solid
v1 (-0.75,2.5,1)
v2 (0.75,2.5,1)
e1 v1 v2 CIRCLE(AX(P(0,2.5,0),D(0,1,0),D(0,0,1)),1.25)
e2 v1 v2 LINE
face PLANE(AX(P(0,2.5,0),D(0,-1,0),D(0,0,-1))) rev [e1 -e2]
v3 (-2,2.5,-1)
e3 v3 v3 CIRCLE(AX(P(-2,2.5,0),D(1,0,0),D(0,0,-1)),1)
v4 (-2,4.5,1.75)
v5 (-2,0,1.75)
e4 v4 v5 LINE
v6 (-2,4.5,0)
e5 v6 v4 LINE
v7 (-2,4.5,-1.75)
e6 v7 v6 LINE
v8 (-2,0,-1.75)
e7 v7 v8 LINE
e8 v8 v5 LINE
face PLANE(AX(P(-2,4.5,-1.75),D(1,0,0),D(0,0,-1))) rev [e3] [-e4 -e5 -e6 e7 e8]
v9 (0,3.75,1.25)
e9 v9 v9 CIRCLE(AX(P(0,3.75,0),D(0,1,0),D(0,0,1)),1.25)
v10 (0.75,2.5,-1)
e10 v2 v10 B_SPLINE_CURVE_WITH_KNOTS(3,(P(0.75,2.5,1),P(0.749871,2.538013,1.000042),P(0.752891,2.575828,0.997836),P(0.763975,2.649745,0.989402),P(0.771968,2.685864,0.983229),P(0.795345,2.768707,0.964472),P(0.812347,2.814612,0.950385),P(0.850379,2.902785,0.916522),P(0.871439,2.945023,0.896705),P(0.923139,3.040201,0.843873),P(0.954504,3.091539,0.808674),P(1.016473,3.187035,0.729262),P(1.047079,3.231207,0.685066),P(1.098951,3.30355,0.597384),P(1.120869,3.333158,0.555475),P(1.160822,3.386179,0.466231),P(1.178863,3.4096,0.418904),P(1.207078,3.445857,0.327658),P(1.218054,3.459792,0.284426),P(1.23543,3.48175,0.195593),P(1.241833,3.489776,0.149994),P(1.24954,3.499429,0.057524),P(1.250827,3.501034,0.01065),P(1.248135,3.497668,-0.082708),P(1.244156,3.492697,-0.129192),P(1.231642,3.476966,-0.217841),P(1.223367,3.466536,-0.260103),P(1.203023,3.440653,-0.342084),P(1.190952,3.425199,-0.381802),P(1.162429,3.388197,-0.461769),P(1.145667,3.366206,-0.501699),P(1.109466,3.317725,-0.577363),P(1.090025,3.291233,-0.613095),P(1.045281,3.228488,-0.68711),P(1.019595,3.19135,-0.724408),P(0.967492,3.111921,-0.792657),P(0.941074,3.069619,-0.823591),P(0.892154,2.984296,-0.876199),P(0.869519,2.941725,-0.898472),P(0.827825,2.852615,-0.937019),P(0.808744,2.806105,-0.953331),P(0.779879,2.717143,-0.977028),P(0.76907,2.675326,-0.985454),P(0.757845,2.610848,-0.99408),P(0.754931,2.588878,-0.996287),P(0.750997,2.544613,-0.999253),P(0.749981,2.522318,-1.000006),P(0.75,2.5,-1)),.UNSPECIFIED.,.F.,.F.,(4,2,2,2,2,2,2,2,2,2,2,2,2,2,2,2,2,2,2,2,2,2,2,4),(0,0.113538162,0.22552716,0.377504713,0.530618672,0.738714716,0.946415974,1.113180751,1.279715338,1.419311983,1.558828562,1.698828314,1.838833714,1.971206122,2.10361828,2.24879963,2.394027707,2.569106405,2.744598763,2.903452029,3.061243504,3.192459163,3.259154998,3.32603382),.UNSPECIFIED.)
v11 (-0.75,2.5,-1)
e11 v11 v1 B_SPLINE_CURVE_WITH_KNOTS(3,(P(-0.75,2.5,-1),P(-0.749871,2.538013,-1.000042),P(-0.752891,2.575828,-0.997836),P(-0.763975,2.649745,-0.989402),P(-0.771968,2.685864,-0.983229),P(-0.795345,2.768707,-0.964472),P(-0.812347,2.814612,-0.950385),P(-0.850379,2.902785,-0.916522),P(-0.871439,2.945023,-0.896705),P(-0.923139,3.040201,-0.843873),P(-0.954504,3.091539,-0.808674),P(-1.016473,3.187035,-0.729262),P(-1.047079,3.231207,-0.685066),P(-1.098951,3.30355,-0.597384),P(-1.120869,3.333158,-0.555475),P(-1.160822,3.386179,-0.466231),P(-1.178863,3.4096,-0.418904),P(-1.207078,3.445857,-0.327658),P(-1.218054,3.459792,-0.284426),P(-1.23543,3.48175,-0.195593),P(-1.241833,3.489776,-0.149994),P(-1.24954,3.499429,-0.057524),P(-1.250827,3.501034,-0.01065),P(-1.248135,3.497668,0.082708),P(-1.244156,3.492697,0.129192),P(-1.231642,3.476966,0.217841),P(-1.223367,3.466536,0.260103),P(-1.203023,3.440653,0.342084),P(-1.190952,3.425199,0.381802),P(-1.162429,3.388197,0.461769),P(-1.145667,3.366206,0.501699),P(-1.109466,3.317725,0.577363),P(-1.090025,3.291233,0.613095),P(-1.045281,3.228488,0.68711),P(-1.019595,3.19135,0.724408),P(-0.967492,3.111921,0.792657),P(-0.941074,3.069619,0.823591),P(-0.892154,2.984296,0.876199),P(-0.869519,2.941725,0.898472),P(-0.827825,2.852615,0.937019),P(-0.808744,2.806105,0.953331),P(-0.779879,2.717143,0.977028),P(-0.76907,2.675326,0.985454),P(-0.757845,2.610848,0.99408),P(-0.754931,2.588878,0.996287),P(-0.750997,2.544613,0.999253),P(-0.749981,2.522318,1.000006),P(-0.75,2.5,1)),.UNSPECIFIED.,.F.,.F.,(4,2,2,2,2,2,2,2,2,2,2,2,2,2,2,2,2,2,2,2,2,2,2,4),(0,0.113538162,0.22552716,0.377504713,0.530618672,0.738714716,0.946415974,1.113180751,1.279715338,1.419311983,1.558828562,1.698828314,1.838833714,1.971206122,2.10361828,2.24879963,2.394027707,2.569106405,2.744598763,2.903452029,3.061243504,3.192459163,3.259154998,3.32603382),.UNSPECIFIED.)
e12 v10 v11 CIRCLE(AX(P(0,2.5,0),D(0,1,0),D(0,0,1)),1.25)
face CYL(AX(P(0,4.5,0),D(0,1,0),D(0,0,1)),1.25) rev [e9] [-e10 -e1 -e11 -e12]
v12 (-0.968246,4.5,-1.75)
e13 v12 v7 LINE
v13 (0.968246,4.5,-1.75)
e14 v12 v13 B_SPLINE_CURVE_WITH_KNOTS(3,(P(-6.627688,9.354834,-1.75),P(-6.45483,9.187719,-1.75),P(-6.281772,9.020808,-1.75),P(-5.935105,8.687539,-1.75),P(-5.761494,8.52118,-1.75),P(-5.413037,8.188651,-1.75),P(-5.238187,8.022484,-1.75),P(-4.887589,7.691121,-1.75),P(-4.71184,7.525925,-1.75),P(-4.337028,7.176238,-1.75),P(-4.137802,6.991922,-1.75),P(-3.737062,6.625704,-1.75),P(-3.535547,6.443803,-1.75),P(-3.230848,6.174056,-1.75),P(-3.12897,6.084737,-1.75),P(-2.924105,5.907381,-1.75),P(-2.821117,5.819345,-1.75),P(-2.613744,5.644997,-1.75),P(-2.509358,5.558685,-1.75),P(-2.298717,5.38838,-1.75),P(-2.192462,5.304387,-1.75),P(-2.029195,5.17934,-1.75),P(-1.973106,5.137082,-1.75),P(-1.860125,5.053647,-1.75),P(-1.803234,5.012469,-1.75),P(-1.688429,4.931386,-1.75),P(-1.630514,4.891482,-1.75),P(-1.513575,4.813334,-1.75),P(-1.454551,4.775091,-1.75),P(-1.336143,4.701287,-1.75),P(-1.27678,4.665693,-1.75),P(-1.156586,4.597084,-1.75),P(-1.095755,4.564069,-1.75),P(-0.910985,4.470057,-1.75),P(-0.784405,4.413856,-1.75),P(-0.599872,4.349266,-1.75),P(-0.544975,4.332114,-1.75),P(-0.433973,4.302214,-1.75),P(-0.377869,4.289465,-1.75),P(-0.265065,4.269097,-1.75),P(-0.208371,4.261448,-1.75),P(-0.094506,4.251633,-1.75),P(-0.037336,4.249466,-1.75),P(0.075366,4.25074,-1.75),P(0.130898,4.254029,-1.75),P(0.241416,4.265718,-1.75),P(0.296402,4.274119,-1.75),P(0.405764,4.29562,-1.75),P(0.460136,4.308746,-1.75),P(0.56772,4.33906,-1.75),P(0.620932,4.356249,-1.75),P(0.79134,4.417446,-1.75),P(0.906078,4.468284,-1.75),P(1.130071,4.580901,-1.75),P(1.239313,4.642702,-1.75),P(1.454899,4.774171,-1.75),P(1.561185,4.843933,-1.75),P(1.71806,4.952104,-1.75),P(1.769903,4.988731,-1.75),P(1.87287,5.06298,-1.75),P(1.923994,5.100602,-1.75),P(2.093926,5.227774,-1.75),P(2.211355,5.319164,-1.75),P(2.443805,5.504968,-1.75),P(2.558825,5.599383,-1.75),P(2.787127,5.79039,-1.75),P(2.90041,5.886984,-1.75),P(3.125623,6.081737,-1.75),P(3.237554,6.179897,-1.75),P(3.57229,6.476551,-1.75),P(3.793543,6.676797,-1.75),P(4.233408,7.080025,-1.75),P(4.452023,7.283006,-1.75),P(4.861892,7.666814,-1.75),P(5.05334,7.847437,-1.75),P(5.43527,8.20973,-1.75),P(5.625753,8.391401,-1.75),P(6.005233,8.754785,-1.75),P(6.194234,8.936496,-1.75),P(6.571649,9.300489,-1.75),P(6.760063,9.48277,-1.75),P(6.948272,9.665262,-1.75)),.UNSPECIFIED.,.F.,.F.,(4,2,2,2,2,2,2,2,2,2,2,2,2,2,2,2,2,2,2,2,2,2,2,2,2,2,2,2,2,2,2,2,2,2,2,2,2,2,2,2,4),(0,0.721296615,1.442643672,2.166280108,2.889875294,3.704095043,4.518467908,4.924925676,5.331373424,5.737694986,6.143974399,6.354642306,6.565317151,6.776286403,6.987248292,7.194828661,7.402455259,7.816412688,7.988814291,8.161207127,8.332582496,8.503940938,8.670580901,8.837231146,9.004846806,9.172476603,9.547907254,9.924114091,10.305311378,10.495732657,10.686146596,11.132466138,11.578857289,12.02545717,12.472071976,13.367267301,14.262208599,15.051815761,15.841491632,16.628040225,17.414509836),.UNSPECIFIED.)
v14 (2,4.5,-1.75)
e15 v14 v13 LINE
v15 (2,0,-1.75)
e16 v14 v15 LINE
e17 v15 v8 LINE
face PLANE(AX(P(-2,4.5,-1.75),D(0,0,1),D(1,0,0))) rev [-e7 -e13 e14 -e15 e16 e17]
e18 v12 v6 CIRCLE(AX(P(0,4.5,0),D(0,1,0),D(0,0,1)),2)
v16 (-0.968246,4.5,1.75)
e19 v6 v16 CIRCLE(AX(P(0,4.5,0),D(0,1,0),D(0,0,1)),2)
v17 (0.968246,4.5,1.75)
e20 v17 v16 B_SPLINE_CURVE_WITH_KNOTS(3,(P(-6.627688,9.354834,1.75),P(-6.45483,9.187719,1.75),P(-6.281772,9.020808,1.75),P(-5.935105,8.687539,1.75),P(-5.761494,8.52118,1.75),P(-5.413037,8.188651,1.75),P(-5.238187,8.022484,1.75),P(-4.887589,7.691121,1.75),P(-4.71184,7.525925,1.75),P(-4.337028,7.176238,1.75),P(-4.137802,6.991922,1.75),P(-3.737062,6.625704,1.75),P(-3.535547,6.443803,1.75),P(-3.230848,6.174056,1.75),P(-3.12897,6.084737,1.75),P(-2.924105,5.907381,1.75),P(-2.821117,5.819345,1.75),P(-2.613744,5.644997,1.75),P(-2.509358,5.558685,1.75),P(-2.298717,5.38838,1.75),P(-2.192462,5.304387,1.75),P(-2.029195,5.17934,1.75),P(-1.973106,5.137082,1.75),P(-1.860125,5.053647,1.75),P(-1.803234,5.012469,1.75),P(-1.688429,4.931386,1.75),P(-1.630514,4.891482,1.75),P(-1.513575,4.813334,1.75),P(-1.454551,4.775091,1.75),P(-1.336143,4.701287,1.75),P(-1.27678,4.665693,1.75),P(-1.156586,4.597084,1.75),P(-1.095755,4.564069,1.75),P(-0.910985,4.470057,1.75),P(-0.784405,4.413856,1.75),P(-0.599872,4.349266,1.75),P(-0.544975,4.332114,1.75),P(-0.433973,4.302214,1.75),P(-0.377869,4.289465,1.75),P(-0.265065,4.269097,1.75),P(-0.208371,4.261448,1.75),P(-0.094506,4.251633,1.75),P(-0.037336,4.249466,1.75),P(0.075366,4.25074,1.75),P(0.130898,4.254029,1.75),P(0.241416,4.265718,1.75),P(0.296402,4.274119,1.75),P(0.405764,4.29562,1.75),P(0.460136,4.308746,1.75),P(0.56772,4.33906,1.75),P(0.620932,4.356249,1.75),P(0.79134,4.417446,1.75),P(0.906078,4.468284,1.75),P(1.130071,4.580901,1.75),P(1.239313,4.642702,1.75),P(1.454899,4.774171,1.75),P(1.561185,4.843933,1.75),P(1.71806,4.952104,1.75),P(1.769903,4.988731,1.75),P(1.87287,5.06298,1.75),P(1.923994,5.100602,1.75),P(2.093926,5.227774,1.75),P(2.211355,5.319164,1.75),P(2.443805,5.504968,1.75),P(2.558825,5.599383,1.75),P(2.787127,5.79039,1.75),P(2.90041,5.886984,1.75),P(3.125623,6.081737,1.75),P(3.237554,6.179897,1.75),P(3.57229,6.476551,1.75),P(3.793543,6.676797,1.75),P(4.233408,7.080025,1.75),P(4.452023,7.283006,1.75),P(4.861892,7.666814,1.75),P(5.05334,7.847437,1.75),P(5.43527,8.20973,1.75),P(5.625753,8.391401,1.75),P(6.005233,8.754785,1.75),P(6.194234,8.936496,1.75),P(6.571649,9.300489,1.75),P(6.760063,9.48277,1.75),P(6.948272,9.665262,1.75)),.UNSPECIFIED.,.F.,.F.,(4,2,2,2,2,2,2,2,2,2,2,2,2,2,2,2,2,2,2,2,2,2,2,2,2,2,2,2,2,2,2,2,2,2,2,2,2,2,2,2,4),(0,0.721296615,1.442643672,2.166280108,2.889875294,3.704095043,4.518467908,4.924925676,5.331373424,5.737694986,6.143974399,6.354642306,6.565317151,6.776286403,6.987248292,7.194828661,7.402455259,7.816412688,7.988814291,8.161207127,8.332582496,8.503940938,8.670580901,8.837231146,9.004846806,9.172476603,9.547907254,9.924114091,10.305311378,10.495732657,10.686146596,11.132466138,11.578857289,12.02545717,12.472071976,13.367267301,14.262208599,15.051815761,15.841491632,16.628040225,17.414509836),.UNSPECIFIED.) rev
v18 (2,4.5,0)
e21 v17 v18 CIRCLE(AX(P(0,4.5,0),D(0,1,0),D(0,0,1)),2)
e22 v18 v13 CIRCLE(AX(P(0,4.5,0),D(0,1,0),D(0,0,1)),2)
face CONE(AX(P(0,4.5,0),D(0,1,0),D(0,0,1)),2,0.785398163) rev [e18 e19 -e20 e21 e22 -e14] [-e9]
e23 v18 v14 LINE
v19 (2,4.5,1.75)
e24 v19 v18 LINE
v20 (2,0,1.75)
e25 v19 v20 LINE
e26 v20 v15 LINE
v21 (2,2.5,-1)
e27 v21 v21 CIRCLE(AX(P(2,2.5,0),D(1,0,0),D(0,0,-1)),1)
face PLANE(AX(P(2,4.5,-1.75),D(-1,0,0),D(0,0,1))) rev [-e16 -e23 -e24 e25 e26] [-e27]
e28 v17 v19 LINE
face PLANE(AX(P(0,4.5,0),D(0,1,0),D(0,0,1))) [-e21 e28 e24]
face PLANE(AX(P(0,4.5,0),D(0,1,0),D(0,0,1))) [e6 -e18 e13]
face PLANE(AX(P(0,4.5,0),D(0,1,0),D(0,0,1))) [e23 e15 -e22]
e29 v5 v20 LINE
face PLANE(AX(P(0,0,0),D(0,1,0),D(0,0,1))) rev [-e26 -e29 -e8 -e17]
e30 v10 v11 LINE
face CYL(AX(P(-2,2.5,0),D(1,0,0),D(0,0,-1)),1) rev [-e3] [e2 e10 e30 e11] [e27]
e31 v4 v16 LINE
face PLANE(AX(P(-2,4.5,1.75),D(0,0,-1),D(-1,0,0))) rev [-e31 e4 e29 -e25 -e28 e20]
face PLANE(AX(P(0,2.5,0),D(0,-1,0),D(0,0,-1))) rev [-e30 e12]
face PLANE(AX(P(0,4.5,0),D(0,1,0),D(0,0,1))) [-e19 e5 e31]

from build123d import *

# Parameters (mm, degrees)
TERMINALBODYS_W        = 4
TERMINALBODYS_H        = 3.5
TERMINAL_BODY_DEPTH    = 4.5
WIRE_ACCESS_DEPTH      = 6.22613624
WIRE_ACCESS_DEPTH_BACK = 6.22613624
WIREACCESSS_R          = 1


# Read off the part's stored shape, not the designer's step: M3x0.5 Tapped Hole1
with BuildPart() as part:
    # TerminalBodyS → TERMINAL BODY (new body)
    with BuildSketch(Plane(origin=(0, 0, 0), x_dir=(1, 0, 0), z_dir=(0, 1, 0))):
        Rectangle(TERMINALBODYS_W, TERMINALBODYS_H)
    extrude(amount=TERMINAL_BODY_DEPTH)

    # WireAccessS → WIRE ACCESS (cut, two sides: drawn at the far end of the back side and taken through both)
    with BuildSketch(Plane(origin=(0, 0, 0), x_dir=(0, 0, -1), z_dir=(1, 0, 0)).offset(-WIRE_ACCESS_DEPTH_BACK)):
        with Locations((0, 2.5)):
            Circle(WIREACCESSS_R)
    extrude(amount=WIRE_ACCESS_DEPTH + WIRE_ACCESS_DEPTH_BACK, mode=Mode.SUBTRACT)

    # M3x0.5 Tapped Hole1 outline → M3x0.5 Tapped Hole1 (revolve, cut)
    with BuildSketch(Plane.XY):
        Polygon((2, 4.5), (0, 4.5), (0, 2.5), (1.25, 2.5), (1.25, 3.75), align=None)
    revolve(axis=Axis((0, 0, 0), (0, 1, 0)), mode=Mode.SUBTRACT)


solid = part.part
